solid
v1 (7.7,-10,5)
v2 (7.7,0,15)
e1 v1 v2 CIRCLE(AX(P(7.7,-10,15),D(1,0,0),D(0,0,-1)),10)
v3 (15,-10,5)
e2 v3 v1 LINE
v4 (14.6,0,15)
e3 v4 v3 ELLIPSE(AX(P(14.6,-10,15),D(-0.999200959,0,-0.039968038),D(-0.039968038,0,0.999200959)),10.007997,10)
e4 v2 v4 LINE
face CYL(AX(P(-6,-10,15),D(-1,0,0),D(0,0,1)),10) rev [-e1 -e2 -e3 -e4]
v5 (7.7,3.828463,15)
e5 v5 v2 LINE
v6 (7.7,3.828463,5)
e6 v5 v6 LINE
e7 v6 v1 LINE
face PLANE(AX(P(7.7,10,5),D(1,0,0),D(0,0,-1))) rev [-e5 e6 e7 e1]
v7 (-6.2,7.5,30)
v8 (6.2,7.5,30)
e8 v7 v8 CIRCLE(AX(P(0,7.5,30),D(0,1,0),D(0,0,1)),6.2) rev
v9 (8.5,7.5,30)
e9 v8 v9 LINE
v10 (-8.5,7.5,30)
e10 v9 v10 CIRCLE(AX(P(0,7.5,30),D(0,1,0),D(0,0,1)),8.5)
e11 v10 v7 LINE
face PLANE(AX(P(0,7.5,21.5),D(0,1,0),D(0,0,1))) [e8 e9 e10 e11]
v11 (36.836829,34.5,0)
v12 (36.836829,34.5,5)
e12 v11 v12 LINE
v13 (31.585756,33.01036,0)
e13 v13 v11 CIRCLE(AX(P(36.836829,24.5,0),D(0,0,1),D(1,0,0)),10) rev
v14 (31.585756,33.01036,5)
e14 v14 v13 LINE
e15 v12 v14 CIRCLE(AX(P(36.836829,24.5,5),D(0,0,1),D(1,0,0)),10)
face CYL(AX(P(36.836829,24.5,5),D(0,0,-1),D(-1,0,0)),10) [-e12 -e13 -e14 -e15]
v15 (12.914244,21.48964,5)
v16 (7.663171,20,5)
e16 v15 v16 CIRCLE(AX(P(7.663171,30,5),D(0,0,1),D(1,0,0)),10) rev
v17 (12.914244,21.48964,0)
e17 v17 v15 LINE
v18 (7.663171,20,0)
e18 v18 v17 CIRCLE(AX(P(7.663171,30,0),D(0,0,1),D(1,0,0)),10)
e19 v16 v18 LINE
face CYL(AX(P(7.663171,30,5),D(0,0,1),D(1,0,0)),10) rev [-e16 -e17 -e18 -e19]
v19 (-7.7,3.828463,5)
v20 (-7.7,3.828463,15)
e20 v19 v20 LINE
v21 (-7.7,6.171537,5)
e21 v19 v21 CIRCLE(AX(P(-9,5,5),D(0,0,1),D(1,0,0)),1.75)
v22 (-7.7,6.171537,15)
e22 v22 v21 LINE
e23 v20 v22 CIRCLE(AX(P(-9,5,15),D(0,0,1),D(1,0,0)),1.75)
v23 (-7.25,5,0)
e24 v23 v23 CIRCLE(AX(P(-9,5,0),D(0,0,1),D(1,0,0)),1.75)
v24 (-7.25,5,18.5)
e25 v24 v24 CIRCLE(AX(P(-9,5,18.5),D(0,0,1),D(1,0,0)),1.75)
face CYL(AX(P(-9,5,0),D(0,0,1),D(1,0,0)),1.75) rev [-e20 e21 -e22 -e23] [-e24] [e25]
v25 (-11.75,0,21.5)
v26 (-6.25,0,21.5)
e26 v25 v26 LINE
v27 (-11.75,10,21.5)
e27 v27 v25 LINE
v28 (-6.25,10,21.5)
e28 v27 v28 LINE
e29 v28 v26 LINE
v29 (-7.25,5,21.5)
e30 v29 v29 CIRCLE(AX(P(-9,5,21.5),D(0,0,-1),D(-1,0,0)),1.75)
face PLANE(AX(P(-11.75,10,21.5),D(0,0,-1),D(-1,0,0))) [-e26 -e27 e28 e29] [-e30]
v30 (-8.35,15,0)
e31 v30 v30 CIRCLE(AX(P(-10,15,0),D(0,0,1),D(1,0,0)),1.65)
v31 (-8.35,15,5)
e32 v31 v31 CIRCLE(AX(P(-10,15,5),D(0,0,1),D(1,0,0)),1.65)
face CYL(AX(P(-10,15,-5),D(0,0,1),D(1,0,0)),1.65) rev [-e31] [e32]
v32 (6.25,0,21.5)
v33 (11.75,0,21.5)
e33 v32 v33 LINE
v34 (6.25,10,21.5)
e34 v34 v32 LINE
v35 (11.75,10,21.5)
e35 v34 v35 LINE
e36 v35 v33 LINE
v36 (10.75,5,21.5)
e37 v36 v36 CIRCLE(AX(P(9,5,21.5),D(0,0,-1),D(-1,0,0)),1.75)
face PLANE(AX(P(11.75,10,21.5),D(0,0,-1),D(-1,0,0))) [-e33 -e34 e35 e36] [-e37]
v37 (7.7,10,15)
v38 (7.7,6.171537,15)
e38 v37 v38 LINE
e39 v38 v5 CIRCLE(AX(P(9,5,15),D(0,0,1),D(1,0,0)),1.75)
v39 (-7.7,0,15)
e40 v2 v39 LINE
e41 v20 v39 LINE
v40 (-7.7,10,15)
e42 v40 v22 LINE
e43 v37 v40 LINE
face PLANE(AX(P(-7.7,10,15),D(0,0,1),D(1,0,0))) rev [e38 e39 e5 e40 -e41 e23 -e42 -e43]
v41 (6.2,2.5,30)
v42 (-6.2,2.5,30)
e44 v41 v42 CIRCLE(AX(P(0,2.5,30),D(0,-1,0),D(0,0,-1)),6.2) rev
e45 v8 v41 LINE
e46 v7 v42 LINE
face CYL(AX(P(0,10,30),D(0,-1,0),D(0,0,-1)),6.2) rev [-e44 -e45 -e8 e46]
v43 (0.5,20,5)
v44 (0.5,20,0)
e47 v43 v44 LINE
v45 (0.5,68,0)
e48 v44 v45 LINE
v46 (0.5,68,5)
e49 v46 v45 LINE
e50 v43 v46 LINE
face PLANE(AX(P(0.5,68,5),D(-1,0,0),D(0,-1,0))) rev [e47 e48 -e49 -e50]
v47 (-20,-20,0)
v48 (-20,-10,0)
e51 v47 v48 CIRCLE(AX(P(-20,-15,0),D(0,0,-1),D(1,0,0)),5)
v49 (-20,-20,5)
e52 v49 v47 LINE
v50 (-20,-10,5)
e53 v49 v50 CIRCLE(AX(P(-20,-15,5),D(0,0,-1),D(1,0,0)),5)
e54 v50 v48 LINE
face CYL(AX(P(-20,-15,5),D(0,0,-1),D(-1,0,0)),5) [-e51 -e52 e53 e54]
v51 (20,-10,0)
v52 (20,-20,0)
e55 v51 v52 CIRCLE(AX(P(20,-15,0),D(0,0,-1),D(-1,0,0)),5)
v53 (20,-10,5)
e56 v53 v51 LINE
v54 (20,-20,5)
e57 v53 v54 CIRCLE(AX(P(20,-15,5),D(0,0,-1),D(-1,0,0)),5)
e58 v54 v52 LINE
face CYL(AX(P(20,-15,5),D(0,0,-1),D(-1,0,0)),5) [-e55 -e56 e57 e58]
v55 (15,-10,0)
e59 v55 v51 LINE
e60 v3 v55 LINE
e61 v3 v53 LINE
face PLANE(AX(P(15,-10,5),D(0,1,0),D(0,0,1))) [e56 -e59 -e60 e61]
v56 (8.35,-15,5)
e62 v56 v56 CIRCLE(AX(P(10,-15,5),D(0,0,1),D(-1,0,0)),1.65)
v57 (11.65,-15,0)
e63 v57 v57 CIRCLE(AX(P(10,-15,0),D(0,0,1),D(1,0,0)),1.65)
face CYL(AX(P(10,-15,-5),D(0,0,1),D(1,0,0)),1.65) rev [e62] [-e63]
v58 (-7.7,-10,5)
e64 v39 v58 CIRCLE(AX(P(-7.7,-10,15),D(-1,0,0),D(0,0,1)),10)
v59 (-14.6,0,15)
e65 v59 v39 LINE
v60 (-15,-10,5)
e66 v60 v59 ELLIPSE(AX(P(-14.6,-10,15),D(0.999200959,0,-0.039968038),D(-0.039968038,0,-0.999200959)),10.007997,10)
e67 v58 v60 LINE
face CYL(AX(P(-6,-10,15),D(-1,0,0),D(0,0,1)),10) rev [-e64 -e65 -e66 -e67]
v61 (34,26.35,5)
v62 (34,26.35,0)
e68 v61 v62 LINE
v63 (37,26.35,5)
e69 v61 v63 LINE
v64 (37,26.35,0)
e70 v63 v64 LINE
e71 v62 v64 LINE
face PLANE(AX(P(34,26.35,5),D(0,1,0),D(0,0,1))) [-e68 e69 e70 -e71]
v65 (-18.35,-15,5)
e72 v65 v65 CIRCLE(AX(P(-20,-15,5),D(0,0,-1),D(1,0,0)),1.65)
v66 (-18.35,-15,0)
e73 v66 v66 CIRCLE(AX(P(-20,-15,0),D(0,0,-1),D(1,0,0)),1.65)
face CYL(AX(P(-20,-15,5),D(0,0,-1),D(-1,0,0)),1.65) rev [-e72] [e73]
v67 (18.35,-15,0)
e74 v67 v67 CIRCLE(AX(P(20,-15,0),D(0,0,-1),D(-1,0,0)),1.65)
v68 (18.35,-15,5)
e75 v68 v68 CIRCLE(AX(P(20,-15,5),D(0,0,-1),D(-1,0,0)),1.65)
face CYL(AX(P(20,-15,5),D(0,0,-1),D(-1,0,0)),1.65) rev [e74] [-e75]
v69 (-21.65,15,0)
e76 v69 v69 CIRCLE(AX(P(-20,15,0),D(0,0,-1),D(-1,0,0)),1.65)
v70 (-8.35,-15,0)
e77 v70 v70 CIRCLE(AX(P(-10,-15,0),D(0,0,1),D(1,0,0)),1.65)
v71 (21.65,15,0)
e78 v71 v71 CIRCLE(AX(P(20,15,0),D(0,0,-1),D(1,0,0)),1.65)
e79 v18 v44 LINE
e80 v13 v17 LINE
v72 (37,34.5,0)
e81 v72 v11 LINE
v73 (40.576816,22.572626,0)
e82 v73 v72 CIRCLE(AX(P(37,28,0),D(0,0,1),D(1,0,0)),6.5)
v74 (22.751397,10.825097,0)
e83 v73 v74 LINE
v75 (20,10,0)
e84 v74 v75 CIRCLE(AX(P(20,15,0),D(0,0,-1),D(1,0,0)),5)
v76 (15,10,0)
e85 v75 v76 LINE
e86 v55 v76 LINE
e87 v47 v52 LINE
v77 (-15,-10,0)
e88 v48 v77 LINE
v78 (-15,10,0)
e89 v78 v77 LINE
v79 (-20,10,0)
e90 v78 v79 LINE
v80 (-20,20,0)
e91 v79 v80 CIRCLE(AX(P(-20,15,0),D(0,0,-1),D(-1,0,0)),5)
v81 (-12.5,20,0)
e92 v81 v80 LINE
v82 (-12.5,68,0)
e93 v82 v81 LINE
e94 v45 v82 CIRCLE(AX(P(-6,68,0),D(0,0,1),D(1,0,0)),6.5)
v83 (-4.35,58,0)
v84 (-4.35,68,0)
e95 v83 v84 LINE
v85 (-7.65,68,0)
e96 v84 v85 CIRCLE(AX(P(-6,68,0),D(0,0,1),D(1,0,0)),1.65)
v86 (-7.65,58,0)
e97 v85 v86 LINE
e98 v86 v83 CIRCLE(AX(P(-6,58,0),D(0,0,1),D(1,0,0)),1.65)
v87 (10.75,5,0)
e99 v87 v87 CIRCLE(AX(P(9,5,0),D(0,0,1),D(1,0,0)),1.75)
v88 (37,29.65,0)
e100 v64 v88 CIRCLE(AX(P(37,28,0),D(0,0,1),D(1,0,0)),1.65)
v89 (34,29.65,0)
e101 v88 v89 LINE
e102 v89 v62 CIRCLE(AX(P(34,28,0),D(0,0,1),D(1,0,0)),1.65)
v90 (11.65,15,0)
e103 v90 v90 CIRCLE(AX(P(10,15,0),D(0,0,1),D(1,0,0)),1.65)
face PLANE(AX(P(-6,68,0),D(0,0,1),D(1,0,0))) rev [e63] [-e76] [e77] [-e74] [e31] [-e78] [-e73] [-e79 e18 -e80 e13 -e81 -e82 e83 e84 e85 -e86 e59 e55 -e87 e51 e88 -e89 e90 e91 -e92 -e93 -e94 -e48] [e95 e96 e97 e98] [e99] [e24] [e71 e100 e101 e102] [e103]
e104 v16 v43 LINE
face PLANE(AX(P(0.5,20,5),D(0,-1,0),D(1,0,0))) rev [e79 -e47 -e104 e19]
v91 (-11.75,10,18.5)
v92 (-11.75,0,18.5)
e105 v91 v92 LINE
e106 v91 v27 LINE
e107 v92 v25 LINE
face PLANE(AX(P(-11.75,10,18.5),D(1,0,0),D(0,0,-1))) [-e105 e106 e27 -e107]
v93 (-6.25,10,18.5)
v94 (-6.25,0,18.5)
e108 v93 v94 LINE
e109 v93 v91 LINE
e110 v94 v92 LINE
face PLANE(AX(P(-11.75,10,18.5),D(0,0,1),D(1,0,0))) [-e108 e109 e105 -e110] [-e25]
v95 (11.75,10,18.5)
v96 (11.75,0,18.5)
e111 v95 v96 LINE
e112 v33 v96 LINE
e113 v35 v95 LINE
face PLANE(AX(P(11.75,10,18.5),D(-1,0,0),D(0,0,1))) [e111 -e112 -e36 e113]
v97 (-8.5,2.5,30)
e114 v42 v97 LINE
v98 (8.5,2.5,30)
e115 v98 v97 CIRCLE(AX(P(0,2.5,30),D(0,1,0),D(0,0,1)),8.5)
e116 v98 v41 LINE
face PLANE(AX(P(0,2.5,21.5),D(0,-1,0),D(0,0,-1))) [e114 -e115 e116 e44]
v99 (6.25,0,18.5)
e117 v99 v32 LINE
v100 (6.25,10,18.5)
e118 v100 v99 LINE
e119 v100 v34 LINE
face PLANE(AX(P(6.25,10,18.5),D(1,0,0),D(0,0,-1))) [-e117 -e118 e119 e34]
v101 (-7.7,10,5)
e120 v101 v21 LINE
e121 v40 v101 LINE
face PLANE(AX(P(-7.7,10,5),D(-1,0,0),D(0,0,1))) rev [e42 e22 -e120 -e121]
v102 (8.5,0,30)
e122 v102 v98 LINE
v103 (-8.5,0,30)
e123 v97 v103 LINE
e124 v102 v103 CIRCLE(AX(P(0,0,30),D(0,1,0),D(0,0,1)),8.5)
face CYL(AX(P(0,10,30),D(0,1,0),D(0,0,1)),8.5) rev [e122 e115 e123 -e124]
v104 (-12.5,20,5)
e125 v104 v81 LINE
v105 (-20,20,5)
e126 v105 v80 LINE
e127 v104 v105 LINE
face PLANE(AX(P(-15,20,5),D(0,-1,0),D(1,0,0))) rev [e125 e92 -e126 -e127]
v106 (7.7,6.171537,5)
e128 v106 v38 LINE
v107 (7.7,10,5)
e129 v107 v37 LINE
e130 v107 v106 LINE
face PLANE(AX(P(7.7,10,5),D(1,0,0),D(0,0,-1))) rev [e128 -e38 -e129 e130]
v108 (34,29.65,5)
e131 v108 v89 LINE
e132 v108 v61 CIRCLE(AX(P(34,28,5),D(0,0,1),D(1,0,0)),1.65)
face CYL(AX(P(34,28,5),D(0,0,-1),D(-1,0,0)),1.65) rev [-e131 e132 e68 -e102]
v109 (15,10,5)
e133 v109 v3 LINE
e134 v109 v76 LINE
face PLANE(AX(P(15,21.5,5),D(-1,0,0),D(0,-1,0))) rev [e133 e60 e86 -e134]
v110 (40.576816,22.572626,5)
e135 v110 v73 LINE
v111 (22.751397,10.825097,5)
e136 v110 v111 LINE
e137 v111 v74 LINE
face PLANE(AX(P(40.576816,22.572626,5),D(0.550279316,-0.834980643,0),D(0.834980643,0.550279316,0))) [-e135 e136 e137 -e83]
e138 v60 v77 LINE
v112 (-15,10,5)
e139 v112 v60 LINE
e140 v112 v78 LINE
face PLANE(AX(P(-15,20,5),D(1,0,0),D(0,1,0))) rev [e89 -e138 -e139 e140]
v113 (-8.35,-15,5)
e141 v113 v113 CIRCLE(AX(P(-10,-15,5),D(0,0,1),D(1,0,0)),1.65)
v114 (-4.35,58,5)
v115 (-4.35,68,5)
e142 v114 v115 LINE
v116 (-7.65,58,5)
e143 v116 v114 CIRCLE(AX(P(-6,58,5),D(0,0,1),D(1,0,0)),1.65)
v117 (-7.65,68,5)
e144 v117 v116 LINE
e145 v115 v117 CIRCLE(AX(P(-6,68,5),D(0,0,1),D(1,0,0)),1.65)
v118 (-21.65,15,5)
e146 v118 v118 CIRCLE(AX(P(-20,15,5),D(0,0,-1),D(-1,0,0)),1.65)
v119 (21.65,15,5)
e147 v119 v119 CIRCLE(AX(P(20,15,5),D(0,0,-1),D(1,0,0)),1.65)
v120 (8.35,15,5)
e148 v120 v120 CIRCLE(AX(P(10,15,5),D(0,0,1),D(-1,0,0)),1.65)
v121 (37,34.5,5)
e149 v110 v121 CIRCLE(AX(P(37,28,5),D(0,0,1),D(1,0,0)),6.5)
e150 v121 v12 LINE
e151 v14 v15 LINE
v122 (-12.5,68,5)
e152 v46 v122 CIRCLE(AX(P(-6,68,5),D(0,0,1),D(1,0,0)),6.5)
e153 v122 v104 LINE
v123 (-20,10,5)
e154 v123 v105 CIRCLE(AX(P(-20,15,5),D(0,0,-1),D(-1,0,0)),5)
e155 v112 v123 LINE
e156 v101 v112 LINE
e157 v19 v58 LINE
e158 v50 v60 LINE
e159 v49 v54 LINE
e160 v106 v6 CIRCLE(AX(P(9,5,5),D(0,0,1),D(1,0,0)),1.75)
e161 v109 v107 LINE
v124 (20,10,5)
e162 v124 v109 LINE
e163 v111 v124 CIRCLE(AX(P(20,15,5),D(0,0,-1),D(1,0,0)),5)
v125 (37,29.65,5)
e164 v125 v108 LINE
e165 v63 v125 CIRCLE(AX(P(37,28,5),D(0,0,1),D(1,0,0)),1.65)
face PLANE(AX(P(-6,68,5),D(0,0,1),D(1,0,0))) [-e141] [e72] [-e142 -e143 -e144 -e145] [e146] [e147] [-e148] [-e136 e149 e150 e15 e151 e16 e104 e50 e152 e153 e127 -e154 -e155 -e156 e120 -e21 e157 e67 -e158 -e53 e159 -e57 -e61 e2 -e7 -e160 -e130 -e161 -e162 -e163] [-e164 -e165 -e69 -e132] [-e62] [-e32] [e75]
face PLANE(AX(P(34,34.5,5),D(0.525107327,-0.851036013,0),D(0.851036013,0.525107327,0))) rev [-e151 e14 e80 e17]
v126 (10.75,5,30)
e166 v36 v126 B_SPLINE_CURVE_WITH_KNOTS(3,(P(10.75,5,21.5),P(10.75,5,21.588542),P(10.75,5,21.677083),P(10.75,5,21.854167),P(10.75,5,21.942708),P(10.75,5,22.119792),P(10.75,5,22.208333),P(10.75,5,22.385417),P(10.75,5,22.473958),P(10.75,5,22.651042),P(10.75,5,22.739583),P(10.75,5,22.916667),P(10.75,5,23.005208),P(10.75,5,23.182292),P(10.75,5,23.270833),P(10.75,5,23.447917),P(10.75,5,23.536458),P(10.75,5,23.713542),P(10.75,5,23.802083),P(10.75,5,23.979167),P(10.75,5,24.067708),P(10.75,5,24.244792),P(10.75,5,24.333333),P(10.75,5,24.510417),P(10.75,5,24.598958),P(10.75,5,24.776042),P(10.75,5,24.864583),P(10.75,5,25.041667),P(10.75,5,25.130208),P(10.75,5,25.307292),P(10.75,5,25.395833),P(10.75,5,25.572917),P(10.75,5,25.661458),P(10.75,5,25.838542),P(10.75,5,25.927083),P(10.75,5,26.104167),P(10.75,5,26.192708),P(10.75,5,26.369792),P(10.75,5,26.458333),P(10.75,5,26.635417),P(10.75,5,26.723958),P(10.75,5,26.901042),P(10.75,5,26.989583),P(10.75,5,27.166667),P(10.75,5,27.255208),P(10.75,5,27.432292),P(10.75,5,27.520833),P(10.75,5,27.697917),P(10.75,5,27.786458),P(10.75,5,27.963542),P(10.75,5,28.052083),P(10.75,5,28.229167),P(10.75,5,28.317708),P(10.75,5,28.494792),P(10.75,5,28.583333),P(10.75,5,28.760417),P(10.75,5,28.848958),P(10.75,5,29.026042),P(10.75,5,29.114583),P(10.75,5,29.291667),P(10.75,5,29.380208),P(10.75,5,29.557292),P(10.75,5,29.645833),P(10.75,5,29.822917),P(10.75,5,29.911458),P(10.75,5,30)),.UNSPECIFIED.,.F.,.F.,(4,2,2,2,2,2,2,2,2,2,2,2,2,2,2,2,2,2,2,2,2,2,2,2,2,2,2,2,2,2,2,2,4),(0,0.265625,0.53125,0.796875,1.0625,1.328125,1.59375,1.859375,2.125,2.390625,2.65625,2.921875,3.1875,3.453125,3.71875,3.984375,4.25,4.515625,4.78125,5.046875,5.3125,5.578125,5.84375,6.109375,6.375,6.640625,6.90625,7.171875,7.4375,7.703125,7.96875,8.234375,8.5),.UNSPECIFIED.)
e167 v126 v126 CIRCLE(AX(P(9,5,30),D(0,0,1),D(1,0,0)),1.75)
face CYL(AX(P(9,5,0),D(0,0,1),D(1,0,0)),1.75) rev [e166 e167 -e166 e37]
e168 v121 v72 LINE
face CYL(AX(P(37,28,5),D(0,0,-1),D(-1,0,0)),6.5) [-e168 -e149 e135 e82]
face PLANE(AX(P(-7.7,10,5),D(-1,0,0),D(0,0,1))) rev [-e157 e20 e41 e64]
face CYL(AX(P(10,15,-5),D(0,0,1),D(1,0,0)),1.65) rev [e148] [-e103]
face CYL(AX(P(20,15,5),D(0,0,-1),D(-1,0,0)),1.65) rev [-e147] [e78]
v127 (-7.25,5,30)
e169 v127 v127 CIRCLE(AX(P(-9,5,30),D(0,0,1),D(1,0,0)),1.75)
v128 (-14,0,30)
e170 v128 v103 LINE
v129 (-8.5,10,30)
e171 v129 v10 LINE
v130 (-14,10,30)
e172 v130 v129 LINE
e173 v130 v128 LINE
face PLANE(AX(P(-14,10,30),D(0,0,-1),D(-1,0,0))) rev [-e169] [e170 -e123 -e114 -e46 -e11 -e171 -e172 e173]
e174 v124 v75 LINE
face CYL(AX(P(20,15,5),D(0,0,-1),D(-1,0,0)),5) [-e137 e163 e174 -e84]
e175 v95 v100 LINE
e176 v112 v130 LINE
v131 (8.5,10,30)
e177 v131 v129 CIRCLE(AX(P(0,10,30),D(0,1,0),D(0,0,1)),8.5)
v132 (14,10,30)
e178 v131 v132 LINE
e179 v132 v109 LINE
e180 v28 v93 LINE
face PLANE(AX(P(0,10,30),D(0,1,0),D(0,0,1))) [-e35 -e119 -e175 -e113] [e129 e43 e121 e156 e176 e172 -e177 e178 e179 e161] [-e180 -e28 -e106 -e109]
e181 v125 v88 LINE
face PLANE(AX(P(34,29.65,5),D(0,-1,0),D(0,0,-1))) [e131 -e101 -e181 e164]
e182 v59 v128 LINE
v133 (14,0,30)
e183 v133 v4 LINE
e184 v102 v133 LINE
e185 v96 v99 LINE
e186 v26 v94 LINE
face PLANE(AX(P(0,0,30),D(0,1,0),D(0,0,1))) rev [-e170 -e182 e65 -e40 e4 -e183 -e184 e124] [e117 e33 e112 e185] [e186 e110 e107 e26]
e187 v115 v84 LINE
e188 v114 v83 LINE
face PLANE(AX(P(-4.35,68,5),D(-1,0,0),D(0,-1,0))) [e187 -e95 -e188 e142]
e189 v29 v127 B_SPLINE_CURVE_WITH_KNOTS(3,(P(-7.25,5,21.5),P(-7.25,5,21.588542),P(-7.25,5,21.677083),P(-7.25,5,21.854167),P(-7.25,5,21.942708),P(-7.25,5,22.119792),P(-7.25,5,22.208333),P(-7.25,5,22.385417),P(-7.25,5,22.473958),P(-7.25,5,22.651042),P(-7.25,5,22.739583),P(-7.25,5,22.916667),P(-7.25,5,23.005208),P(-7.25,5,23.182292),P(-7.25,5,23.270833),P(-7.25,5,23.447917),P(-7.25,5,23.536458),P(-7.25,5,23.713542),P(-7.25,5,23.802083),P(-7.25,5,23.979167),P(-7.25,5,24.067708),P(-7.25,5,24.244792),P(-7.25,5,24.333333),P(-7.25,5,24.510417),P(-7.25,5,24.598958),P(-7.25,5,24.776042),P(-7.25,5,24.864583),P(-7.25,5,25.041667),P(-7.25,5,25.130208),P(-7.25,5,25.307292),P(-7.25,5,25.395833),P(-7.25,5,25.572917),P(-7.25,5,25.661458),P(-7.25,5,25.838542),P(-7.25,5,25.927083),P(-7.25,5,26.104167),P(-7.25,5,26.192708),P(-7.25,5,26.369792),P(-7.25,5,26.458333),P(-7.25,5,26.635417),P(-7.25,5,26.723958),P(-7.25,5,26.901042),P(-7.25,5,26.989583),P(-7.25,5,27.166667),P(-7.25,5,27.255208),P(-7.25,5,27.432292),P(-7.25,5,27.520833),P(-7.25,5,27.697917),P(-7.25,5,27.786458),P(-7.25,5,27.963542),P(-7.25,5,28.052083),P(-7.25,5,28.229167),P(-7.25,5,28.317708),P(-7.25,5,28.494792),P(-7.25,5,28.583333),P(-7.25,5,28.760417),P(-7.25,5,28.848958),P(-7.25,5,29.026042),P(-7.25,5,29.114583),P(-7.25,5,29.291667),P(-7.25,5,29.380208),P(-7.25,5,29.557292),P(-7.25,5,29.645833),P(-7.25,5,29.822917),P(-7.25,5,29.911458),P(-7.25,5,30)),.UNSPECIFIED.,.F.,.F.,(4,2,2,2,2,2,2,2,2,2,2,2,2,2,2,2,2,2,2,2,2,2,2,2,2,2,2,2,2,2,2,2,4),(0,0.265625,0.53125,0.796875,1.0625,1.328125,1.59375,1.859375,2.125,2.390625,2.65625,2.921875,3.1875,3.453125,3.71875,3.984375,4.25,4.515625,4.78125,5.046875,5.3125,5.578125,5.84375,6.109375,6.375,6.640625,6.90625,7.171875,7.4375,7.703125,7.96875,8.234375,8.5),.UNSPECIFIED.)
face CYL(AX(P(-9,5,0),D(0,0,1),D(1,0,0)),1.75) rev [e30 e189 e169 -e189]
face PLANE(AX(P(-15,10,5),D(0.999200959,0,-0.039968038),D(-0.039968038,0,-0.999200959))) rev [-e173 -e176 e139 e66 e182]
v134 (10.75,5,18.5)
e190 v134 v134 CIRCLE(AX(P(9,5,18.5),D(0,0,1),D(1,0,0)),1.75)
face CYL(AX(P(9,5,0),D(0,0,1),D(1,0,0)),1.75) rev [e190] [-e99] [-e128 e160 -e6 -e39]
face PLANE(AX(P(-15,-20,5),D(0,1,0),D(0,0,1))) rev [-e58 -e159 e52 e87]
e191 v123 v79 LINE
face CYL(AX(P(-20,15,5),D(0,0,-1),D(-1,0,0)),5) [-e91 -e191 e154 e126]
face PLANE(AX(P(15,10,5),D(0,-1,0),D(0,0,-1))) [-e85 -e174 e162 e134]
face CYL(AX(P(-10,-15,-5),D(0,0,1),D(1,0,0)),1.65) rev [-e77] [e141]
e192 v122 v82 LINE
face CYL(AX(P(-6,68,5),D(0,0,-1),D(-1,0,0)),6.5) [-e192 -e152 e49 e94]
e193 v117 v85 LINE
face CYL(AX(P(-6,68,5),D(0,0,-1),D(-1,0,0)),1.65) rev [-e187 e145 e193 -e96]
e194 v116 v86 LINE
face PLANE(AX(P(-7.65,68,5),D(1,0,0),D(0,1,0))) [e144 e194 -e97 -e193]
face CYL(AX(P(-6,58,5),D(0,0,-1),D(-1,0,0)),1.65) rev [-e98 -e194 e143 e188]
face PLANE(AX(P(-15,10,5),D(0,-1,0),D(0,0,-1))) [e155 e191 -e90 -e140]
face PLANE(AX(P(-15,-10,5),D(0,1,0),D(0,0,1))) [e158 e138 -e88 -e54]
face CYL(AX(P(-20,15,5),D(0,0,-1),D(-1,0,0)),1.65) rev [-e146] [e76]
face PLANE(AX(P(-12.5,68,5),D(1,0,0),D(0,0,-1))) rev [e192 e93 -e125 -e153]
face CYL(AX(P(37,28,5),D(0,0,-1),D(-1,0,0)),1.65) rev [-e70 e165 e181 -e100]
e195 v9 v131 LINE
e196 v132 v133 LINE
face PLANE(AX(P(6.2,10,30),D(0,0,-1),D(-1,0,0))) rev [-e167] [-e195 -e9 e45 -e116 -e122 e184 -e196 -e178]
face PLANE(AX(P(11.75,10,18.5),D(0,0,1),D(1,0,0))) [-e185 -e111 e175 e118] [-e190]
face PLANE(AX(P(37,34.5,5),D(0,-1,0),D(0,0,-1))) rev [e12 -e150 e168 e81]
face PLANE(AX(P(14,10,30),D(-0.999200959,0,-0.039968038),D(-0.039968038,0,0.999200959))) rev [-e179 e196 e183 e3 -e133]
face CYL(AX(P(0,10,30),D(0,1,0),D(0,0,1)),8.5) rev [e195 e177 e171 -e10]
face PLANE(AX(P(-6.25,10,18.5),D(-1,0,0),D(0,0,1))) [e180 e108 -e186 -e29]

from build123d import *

# Parameters (mm, degrees)
RESSALTO_EXTRUS_O1_DEPTH = 5
ESBO_O2_W                = 5.5
ESBO_O2_H                = 3
RESSALTO_EXTRUS_O2_DEPTH = 10
ESBO_O4_W                = 8.5
ESBO_O4_H                = 2.5
ESBO_O6_R                = 1.75
CORTE_EXTRUS_O2_DEPTH    = 92.337287019
ESBO_O7_R                = 1.65
CORTE_EXTRUS_O3_DEPTH    = 10
ESBO_O8_R                = 1.65
RESSALTO_EXTRUS_O3_DEPTH = 5
FILETE3_R                = 10
FILETE4_R                = 10


with BuildPart() as part:
    # Esboço1 → Ressalto-extrusão1 (new body)
    with BuildSketch(Plane.XY):
        with BuildLine():
            Line((0.5, 68), (0.5, 33.5))
            Line((0.5, 33.5), (0.5, 20))
            Line((0.5, 20), (10.5, 20))
            Line((10.5, 20), (34, 34.5))
            Line((34, 34.5), (37, 34.5))
            ThreePointArc((37, 34.5), (43.5, 28), (37, 21.5))
            Line((37, 21.5), (15, 21.5))
            Line((15, 21.5), (15, -20))
            Line((15, -20), (-15, -20))
            Line((-15, -20), (-15, 20))
            Line((-15, 20), (-12.5, 20))
            Line((-12.5, 20), (-12.5, 68))
            ThreePointArc((-12.5, 68), (-6, 74.5), (0.5, 68))
        make_face()
        with BuildLine():
            Line((-4.35, 68), (-4.35, 58))
            ThreePointArc((-4.35, 58), (-6, 56.35), (-7.65, 58))
            Line((-7.65, 58), (-7.65, 68))
            ThreePointArc((-7.65, 68), (-6, 69.65), (-4.35, 68))
        make_face(mode=Mode.SUBTRACT)
        with BuildLine():
            Line((34, 26.35), (37, 26.35))
            ThreePointArc((37, 26.35), (38.65, 28), (37, 29.65))
            Line((37, 29.65), (34, 29.65))
            ThreePointArc((34, 29.65), (32.35, 28), (34, 26.35))
        make_face(mode=Mode.SUBTRACT)
    extrude(amount=RESSALTO_EXTRUS_O1_DEPTH)

    # Esboço2 → Ressalto-extrusão2 (add)
    with BuildSketch(Plane(origin=(0, 0, 0), x_dir=(1, 0, 0), z_dir=(0, 1, 0))):
        with BuildLine():
            Line((14, -30), (15, -5))
            Line((15, -5), (7.7, -5))
            Line((7.7, -5), (7.7, -15))
            Line((7.7, -15), (-7.7, -15))
            Line((-7.7, -15), (-7.7, -5))
            Line((-7.7, -5), (-15, -5))
            Line((-15, -5), (-14, -30))
            Line((-14, -30), (-6.2, -30))
            ThreePointArc((-6.2, -30), (0, -23.8), (6.2, -30))
            Line((6.2, -30), (14, -30))
        make_face()
        with Locations((-9, -20)):
            Rectangle(ESBO_O2_W, ESBO_O2_H, mode=Mode.SUBTRACT)
        with Locations((9, -20)):
            Rectangle(ESBO_O2_W, ESBO_O2_H, mode=Mode.SUBTRACT)
    extrude(amount=RESSALTO_EXTRUS_O2_DEPTH)

    # Esboço4 → Corte-Revolução3 (revolve, cut)
    with BuildSketch(Plane(origin=(0, 0, 0), x_dir=(0, 0, -1), z_dir=(1, 0, 0))):
        with Locations((-25.75, 8.75)):
            Rectangle(ESBO_O4_W, ESBO_O4_H)
        with Locations((-25.75, 1.25)):
            Rectangle(ESBO_O4_W, ESBO_O4_H)
    revolve(axis=Axis((0, 10, 30), (0, -1, 0)), mode=Mode.SUBTRACT)

    # Esboço6 → Corte-extrusão2 (cut, through all)
    with BuildSketch(Plane.XY.offset(30)):
        with Locations((-9, 5)):
            Circle(ESBO_O6_R)
        with Locations((9, 5)):
            Circle(ESBO_O6_R)
    extrude(amount=-CORTE_EXTRUS_O2_DEPTH, mode=Mode.SUBTRACT)

    # Esboço7 → Corte-extrusão3 (cut)
    with BuildSketch(Plane.XY.offset(5)):
        with Locations((-10, 15)):
            Circle(ESBO_O7_R)
        with Locations((-10, -15)):
            Circle(ESBO_O7_R)
        with Locations((10, -15)):
            Circle(ESBO_O7_R)
        with Locations((10, 15)):
            Circle(ESBO_O7_R)
    extrude(amount=-CORTE_EXTRUS_O3_DEPTH, mode=Mode.SUBTRACT)

    # Esboço8 → Ressalto-extrusão3 (add)
    # profile 1 of 4: a face of its own
    with BuildSketch(Plane(origin=(0, 0, 0), x_dir=(-1, 0, 0), z_dir=(0, 0, -1))):
        with BuildLine():
            Line((20, 20), (15, 20))
            Line((15, 20), (15, 10))
            Line((15, 10), (20, 10))
            ThreePointArc((20, 10), (25, 15), (20, 20))
        make_face()
        with Locations((20, 15)):
            Circle(ESBO_O8_R, mode=Mode.SUBTRACT)
    # profile 2 of 4: a face of its own
    with BuildSketch(Plane(origin=(0, 0, 0), x_dir=(-1, 0, 0), z_dir=(0, 0, -1))):
        with BuildLine():
            Line((-15, 10), (-20, 10))
            ThreePointArc((-20, 10), (-21.436224898, 10.210714245), (-22.751396578, 10.825096783))
            Line((-22.751396578, 10.825096783), (-40.576815551, 22.572625818))
            ThreePointArc((-40.576815551, 22.572625818), (-38.867092367, 21.773928519), (-37, 21.5))
            Line((-37, 21.5), (-15, 21.5))
            Line((-15, 21.5), (-15, 10))
        make_face()
        with Locations(Location((-20, 15, 0), (0, 0, 180))):
            Circle(ESBO_O8_R, mode=Mode.SUBTRACT)
    # profile 3 of 4: a face of its own
    with BuildSketch(Plane(origin=(0, 0, 0), x_dir=(-1, 0, 0), z_dir=(0, 0, -1))):
        with BuildLine():
            Line((15, -10), (20, -10))
            ThreePointArc((20, -10), (25, -15), (20, -20))
            Line((20, -20), (15, -20))
            Line((15, -20), (15, -10))
        make_face()
        with Locations(Location((20, -15, 0), (0, 0, 180))):
            Circle(ESBO_O8_R, mode=Mode.SUBTRACT)
    # profile 4 of 4: a face of its own
    with BuildSketch(Plane(origin=(0, 0, 0), x_dir=(-1, 0, 0), z_dir=(0, 0, -1))):
        with BuildLine():
            Line((-20, -20), (-15, -20))
            Line((-15, -20), (-15, -10))
            Line((-15, -10), (-20, -10))
            ThreePointArc((-20, -10), (-25, -15), (-20, -20))
        make_face()
        with Locations((-20, -15)):
            Circle(ESBO_O8_R, mode=Mode.SUBTRACT)
    extrude(amount=-RESSALTO_EXTRUS_O3_DEPTH)

    # Filete3
    filete3_edges = [part.edges().sort_by_distance(p)[0] for p in [
        (10.5, 20, 2.5),
        (34, 34.5, 2.5),
    ]]
    fillet(filete3_edges, radius=FILETE3_R)

    # Filete4
    filete4_edges = [part.edges().sort_by_distance(p)[0] for p in [
        (-11.35, 0, 5),
        (11.35, 0, 5),
    ]]
    fillet(filete4_edges, radius=FILETE4_R - 0.0001)  # a hair under: the kernel refuses the full size


solid = part.part
